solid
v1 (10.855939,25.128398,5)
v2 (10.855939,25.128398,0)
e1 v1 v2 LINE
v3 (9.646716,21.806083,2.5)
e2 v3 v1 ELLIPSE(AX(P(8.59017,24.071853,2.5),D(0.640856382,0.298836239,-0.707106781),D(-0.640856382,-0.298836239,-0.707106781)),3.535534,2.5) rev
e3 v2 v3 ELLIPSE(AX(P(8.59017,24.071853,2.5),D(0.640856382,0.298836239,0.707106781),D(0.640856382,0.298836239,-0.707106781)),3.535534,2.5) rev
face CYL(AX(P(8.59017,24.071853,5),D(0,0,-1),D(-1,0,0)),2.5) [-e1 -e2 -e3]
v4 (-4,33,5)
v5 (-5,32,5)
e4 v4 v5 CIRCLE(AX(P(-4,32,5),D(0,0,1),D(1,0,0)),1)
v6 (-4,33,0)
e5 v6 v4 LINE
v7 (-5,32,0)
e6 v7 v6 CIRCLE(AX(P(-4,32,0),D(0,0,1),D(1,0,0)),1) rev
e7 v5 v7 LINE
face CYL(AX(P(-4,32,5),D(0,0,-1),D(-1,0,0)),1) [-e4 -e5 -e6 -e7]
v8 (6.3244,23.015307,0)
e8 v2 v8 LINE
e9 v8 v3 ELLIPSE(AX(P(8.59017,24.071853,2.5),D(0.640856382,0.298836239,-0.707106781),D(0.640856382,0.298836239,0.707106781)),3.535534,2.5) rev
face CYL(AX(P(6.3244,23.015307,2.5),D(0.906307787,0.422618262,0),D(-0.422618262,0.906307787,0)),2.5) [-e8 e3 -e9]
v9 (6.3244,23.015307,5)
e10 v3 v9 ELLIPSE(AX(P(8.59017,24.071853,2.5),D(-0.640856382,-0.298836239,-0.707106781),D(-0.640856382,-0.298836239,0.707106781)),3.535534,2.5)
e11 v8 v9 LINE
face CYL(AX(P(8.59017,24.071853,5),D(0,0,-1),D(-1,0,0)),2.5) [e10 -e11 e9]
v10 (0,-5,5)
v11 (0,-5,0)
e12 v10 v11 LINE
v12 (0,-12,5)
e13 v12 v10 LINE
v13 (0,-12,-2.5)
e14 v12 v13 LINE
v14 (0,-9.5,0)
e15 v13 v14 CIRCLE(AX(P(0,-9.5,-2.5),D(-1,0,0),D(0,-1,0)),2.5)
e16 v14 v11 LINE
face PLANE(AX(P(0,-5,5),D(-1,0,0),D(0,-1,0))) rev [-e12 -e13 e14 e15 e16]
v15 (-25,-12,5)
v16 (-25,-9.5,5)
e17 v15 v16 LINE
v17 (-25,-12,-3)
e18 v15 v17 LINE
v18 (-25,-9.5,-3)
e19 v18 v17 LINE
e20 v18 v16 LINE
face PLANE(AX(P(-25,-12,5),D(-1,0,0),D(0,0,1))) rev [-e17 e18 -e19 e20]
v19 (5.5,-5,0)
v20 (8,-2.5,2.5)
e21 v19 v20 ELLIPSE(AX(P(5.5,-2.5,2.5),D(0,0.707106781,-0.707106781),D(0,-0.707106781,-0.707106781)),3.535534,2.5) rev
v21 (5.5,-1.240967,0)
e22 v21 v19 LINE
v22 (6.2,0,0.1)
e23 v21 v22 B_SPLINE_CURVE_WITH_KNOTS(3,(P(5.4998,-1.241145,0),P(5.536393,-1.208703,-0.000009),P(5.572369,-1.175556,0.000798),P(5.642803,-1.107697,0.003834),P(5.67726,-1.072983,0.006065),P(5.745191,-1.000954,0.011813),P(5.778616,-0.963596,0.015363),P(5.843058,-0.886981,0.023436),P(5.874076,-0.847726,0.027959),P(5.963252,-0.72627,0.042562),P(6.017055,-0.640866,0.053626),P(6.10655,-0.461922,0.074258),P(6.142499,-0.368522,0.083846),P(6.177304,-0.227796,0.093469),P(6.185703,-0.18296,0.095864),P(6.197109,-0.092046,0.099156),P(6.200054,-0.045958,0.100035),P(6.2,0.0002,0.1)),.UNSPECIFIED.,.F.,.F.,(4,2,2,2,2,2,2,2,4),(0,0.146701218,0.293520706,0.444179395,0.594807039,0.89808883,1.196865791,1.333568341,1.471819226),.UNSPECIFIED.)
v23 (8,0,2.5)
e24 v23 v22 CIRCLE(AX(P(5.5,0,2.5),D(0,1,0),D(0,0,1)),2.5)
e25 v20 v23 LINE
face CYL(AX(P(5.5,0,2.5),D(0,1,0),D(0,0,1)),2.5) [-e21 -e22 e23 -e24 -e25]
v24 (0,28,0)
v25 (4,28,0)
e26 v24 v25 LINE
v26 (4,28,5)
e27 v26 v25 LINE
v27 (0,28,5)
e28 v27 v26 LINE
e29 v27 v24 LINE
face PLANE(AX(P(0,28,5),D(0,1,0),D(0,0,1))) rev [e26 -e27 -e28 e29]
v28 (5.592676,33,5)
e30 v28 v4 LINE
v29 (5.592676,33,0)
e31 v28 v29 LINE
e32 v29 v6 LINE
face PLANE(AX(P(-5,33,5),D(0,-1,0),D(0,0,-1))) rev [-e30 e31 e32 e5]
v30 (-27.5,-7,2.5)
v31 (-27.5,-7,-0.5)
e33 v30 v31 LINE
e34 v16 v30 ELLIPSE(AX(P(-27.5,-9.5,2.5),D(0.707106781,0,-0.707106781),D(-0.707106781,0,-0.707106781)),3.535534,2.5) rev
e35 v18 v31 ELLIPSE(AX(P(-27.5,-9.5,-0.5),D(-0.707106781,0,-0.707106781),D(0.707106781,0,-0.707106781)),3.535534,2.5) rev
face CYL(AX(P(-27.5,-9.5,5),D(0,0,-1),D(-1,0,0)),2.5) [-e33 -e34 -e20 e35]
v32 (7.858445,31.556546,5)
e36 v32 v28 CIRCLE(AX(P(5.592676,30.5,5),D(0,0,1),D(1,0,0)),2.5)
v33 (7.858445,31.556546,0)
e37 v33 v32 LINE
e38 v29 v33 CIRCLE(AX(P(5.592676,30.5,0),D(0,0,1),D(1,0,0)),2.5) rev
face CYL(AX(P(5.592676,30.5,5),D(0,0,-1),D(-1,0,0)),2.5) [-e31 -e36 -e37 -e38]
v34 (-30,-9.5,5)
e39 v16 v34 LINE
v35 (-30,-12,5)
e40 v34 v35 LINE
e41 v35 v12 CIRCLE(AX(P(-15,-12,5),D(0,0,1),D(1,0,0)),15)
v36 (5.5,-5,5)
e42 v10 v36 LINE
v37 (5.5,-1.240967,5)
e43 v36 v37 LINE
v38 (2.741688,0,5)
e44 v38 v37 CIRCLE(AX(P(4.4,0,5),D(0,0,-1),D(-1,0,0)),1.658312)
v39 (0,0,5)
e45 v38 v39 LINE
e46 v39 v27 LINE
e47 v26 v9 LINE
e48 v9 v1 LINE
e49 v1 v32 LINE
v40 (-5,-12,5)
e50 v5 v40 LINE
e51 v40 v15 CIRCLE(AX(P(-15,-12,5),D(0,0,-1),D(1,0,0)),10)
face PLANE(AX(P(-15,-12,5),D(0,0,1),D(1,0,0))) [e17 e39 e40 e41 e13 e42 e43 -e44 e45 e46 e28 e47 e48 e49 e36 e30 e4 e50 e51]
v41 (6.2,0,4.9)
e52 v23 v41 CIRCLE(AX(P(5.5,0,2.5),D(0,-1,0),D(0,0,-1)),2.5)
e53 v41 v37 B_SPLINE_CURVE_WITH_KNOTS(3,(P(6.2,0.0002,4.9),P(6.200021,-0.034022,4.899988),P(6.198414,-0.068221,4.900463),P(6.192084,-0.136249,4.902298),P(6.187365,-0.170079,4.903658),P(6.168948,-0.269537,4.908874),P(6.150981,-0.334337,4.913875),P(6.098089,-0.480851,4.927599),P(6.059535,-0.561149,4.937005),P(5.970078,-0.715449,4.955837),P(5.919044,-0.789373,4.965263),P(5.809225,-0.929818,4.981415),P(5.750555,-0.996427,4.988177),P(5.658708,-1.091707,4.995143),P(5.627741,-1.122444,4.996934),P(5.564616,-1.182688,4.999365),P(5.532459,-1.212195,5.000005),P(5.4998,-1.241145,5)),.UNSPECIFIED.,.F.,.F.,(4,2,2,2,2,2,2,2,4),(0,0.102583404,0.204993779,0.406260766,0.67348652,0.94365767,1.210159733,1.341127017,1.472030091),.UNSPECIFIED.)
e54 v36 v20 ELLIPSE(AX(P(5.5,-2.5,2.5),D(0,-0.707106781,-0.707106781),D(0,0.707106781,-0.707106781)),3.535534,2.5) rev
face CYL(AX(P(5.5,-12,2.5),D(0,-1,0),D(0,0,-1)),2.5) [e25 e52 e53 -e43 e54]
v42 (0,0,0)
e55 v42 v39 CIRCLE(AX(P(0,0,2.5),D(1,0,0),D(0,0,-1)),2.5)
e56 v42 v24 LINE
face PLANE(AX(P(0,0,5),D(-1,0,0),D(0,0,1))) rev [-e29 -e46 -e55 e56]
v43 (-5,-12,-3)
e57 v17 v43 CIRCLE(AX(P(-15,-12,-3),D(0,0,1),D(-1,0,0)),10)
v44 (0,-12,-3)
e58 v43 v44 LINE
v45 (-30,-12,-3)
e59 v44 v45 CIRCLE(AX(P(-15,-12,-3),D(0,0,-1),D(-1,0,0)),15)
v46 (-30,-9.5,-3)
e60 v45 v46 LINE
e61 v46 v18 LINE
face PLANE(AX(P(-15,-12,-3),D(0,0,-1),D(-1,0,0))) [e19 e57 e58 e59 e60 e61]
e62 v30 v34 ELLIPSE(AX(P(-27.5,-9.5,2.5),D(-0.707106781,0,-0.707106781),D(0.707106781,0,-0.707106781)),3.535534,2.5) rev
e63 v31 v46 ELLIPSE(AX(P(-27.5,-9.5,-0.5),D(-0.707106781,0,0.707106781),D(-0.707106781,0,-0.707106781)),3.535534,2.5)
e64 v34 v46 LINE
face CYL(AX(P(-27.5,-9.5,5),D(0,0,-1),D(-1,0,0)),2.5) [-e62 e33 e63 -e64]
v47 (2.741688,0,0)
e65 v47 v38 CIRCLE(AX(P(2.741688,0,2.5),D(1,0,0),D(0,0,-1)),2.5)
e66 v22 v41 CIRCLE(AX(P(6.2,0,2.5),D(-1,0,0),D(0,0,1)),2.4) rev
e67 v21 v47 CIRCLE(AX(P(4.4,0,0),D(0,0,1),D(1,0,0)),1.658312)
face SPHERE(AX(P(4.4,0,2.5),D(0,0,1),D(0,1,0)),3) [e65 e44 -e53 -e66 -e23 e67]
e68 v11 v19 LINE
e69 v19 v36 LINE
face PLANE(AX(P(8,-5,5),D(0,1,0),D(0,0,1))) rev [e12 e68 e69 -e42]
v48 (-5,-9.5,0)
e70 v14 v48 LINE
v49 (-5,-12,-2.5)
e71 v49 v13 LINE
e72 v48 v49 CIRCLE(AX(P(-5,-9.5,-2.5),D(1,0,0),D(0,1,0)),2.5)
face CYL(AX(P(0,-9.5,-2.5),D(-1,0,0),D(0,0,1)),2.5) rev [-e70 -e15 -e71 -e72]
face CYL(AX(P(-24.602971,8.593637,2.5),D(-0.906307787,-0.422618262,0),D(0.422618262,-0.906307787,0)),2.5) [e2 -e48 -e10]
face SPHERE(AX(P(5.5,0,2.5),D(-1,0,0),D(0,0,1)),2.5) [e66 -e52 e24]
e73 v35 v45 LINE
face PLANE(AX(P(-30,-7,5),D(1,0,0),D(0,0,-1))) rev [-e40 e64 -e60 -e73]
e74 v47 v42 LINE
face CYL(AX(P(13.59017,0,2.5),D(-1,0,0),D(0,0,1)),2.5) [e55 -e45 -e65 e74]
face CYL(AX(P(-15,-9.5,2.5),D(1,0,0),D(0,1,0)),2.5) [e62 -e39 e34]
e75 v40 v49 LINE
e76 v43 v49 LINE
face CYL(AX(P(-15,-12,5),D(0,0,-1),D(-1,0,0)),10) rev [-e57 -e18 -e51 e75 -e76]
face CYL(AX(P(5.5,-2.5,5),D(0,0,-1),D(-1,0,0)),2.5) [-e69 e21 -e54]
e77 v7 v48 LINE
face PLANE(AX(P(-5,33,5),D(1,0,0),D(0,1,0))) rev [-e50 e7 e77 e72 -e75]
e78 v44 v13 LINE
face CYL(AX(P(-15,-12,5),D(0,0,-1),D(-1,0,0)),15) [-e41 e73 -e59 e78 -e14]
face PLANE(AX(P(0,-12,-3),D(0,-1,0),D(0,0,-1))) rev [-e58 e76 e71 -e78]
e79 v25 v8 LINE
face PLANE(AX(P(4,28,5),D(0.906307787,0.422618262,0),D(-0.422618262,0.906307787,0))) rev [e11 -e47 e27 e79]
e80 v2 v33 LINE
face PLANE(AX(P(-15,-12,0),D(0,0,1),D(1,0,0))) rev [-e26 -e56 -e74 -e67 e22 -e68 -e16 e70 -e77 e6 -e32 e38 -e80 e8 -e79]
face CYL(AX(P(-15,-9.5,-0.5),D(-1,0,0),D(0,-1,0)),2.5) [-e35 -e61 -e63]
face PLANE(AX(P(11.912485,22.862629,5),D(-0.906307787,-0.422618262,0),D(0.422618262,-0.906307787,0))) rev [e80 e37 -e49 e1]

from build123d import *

# Parameters (mm, degrees)
EXTRUDE_1_DEPTH     = 5
FILLET_1_R          = 2.5
FILLET_2_R          = 1
EXTRUDE_2_DEPTH     = 8
FILLET_3_R          = 2.5
SKETCH_5_W          = 1.467751534
SKETCH_5_H          = 4.178210798
SKETCH_5_W_2        = 1.389566385
CUT_EXTRUDE_1_DEPTH = 20
EXTRUDE_START       = 3
EXTRUDE_3_DEPTH     = 3
FILLET_4_R          = 2.5


with BuildPart() as part:
    # 草图1 → 凸台-拉伸1 (new body)
    with BuildSketch(Plane.XY):
        with BuildLine():
            Line((0, 0), (0, 28))
            Line((0, 28), (4, 28))
            Line((4, 28), (7.380946094, 20.749537704))
            Line((7.380946094, 20.749537704), (11.912485029, 22.862629012))
            Line((11.912485029, 22.862629012), (7.185351304, 33))
            Line((7.185351304, 33), (-5, 33))
            Line((-5, 33), (-5, -12))
            ThreePointArc((-5, -12), (-15, -22), (-25, -12))
            Line((-25, -12), (-25, -7))
            Line((-25, -7), (-30, -7))
            Line((-30, -7), (-30, -12))
            ThreePointArc((-30, -12), (-15, -27), (0, -12))
            Line((0, -12), (0, -5))
            Line((0, -5), (8, -5))
            Line((8, -5), (8, 0))
            Line((8, 0), (0, 0))
        make_face()
    extrude(amount=EXTRUDE_1_DEPTH)

    # 圆角1
    fillet_1_edges = [part.edges().sort_by_distance(p)[0] for p in [
        (9.646715562, 21.806083358, 0),
        (9.646715562, 21.806083358, 5),
        (7.185351304, 33, 2.5),
        (11.912485029, 22.862629012, 2.5),
        (7.380946094, 20.749537704, 2.5),
    ]]
    fillet(fillet_1_edges, radius=FILLET_1_R - 0.0001)  # a hair under: the kernel refuses the full size

    # 圆角2
    fillet_2_edges = [part.edges().sort_by_distance(p)[0] for p in [
        (-5, 33, 2.5),
    ]]
    fillet(fillet_2_edges, radius=FILLET_2_R)

    # 草图3 → 凸台-拉伸2 (add)
    with BuildSketch(Plane(origin=(0, 0, 0), x_dir=(0, 0, -1), z_dir=(1, 0, 0))):
        with BuildLine():
            Line((-5, 0), (0, 0))
            ThreePointArc((0, 0), (-2.5, 2.5), (-5, 0))
        make_face()
    extrude(amount=EXTRUDE_2_DEPTH)

    # 圆角3
    fillet_3_edges = [part.edges().sort_by_distance(p)[0] for p in [
        (8, -2.5, 0),
        (8, -5, 2.5),
        (8, -2.5, 5),
        (8, 2.5, 2.5),
    ]]
    fillet(fillet_3_edges, radius=FILLET_3_R - 0.0001)  # a hair under: the kernel refuses the full size

    # 草图4 → 旋转3 (revolve)
    with BuildSketch(Plane(origin=(4.4, 0, 0), x_dir=(0, 0, -1), z_dir=(1, 0, 0))):
        with BuildLine():
            Line((-5.5, 0), (0.5, 0))
            ThreePointArc((0.5, 0), (-2.5, 3), (-5.5, 0))
        make_face()
    revolve(axis=Axis((4.4, 0, 2.5), (0, 0, -1)))

    # 草图5 → 切除-拉伸1 (cut)
    with BuildSketch(Plane.ZY.offset(5)):
        with Locations((-0.733875767, -0.010051234)):
            Rectangle(SKETCH_5_W, SKETCH_5_H)
        with Locations((5.694783193, -0.010051234)):
            Rectangle(SKETCH_5_W_2, SKETCH_5_H)
    extrude(amount=-CUT_EXTRUDE_1_DEPTH, mode=Mode.SUBTRACT)

    # 草图6 → 凸台-拉伸3 (add)
    with BuildSketch(Plane(origin=(0, 0, 0), x_dir=(-1, 0, 0), z_dir=(0, 0, -1)).offset(EXTRUDE_START)):
        with BuildLine():
            Line((25, -7), (30, -7))
            Line((30, -7), (30, -12))
            ThreePointArc((30, -12), (15, -27), (0, -12))
            Line((0, -12), (5, -12))
            ThreePointArc((5, -12), (15, -22), (25, -12))
            Line((25, -12), (25, -7))
        make_face()
    extrude(amount=-EXTRUDE_3_DEPTH)

    # 圆角4
    fillet_4_edges = [part.edges().sort_by_distance(p)[0] for p in [
        (-2.5, -12, 0),
        (-27.5, -7, -3),
        (-30, -7, 1),
        (-25, -7, 1),
        (-27.5, -7, 5),
    ]]
    fillet(fillet_4_edges, radius=FILLET_4_R - 0.0001)  # a hair under: the kernel refuses the full size


solid = part.part
